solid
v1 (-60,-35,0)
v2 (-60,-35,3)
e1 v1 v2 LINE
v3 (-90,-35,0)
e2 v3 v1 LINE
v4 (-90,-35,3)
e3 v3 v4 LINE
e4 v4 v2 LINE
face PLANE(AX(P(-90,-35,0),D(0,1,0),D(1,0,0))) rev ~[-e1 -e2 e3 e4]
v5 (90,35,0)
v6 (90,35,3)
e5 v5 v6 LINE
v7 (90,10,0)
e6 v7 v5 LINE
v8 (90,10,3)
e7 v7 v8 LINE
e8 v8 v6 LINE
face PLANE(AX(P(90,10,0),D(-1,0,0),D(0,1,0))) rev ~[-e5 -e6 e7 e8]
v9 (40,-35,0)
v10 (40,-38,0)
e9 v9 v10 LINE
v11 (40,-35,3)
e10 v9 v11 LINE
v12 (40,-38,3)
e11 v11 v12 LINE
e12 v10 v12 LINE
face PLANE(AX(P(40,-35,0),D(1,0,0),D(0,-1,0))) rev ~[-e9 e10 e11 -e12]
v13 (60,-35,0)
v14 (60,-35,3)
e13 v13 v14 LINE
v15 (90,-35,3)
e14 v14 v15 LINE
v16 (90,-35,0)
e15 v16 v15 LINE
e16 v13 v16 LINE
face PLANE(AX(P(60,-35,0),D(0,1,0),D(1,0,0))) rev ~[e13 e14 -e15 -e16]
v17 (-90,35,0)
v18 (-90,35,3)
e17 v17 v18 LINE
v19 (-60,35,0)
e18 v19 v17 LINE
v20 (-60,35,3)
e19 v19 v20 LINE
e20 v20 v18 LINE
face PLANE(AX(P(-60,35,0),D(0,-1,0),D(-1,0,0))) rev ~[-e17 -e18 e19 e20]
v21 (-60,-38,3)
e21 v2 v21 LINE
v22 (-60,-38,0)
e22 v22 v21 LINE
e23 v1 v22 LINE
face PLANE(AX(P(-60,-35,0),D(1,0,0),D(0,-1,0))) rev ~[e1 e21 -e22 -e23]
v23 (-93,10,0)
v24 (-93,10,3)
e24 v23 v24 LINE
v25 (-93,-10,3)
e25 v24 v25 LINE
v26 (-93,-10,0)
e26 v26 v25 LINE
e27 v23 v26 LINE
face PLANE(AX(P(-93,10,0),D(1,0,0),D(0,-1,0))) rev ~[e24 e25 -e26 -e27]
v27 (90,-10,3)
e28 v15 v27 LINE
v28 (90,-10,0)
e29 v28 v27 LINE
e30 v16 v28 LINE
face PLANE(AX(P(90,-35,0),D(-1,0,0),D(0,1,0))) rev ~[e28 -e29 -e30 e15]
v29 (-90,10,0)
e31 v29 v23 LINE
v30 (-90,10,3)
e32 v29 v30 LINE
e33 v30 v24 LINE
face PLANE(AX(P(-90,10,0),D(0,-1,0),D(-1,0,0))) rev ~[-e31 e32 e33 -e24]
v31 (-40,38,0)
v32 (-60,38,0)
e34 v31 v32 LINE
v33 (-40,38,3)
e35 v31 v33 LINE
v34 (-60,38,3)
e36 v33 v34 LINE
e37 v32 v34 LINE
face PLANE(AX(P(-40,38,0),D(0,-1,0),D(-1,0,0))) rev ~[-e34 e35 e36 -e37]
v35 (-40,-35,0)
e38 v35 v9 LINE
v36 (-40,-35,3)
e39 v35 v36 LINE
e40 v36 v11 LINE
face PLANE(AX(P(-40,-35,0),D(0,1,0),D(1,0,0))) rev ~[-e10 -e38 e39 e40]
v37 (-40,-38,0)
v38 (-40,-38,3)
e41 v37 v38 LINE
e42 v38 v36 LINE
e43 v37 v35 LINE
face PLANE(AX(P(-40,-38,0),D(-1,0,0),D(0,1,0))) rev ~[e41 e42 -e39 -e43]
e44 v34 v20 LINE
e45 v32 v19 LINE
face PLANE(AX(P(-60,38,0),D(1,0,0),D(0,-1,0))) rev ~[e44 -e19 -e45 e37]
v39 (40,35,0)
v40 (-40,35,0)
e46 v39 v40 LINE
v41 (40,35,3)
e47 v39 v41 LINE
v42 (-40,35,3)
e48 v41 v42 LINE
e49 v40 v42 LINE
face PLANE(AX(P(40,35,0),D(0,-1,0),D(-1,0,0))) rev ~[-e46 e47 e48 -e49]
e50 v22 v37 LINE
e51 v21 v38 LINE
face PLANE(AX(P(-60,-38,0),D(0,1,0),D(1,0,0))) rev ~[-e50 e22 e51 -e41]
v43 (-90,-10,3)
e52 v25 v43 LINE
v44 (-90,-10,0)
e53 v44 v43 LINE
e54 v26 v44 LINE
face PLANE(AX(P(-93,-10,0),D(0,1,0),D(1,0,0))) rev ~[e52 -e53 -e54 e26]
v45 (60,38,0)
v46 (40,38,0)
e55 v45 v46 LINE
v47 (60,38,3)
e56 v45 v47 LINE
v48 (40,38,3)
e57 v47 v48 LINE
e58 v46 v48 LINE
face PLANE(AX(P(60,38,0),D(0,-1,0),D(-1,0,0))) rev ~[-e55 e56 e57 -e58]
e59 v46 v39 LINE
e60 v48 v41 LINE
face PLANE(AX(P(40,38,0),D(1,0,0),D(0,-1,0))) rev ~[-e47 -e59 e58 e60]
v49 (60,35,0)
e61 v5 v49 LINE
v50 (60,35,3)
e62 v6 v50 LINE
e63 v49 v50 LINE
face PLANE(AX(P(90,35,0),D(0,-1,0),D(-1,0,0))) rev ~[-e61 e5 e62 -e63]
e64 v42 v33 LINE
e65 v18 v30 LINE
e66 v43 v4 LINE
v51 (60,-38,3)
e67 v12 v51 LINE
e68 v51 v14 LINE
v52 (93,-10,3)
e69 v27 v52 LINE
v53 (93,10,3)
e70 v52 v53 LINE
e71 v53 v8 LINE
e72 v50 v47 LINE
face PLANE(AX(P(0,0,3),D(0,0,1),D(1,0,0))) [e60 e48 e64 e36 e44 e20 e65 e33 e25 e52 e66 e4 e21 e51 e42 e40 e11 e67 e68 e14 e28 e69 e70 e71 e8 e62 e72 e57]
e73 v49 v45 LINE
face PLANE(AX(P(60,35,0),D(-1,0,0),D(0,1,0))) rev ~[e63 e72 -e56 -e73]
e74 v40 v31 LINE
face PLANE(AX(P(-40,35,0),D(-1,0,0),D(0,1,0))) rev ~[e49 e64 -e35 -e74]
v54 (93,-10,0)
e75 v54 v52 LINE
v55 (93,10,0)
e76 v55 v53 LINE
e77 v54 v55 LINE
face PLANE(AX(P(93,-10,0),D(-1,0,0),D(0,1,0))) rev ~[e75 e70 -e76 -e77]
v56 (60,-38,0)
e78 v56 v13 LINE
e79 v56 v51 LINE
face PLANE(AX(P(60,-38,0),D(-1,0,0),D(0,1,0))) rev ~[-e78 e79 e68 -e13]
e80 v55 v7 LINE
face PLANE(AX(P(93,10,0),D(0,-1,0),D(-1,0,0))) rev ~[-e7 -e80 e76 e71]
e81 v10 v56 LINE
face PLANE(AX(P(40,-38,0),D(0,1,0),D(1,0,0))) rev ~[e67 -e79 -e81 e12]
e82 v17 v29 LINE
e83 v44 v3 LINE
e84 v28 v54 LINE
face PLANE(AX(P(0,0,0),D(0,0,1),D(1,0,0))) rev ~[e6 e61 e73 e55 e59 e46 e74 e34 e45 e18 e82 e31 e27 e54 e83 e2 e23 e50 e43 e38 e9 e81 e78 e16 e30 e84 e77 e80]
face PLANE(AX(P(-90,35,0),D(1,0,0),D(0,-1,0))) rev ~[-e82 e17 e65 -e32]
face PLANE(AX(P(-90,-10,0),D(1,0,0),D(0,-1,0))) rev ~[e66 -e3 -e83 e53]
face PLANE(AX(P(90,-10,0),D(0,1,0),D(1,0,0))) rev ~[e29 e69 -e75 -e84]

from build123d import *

# Parameters (mm, degrees)
F2_DEPTH = 3


# Not quite as in the source:
# - a feature names something its author has since deleted; it is built from what else it names


with BuildPart() as f2:
    # F1 (on Top) → F2 (new body)
    with BuildSketch(Plane.XY):
        Polygon((90, 10), (90, 35), (60, 35), (60, 38), (40, 38), (40, 35), (-40, 35), (-40, 38), (-60, 38), (-60, 35), (-90, 35), (-90, 10), (-93, 10), (-93, -10), (-90, -10), (-90, -35), (-60, -35), (-60, -38), (-40, -38), (-40, -35), (40, -35), (40, -38), (60, -38), (60, -35), (90, -35), (90, -10), (93, -10), (93, 10), align=None)
    extrude(amount=F2_DEPTH)


solid = f2.part
